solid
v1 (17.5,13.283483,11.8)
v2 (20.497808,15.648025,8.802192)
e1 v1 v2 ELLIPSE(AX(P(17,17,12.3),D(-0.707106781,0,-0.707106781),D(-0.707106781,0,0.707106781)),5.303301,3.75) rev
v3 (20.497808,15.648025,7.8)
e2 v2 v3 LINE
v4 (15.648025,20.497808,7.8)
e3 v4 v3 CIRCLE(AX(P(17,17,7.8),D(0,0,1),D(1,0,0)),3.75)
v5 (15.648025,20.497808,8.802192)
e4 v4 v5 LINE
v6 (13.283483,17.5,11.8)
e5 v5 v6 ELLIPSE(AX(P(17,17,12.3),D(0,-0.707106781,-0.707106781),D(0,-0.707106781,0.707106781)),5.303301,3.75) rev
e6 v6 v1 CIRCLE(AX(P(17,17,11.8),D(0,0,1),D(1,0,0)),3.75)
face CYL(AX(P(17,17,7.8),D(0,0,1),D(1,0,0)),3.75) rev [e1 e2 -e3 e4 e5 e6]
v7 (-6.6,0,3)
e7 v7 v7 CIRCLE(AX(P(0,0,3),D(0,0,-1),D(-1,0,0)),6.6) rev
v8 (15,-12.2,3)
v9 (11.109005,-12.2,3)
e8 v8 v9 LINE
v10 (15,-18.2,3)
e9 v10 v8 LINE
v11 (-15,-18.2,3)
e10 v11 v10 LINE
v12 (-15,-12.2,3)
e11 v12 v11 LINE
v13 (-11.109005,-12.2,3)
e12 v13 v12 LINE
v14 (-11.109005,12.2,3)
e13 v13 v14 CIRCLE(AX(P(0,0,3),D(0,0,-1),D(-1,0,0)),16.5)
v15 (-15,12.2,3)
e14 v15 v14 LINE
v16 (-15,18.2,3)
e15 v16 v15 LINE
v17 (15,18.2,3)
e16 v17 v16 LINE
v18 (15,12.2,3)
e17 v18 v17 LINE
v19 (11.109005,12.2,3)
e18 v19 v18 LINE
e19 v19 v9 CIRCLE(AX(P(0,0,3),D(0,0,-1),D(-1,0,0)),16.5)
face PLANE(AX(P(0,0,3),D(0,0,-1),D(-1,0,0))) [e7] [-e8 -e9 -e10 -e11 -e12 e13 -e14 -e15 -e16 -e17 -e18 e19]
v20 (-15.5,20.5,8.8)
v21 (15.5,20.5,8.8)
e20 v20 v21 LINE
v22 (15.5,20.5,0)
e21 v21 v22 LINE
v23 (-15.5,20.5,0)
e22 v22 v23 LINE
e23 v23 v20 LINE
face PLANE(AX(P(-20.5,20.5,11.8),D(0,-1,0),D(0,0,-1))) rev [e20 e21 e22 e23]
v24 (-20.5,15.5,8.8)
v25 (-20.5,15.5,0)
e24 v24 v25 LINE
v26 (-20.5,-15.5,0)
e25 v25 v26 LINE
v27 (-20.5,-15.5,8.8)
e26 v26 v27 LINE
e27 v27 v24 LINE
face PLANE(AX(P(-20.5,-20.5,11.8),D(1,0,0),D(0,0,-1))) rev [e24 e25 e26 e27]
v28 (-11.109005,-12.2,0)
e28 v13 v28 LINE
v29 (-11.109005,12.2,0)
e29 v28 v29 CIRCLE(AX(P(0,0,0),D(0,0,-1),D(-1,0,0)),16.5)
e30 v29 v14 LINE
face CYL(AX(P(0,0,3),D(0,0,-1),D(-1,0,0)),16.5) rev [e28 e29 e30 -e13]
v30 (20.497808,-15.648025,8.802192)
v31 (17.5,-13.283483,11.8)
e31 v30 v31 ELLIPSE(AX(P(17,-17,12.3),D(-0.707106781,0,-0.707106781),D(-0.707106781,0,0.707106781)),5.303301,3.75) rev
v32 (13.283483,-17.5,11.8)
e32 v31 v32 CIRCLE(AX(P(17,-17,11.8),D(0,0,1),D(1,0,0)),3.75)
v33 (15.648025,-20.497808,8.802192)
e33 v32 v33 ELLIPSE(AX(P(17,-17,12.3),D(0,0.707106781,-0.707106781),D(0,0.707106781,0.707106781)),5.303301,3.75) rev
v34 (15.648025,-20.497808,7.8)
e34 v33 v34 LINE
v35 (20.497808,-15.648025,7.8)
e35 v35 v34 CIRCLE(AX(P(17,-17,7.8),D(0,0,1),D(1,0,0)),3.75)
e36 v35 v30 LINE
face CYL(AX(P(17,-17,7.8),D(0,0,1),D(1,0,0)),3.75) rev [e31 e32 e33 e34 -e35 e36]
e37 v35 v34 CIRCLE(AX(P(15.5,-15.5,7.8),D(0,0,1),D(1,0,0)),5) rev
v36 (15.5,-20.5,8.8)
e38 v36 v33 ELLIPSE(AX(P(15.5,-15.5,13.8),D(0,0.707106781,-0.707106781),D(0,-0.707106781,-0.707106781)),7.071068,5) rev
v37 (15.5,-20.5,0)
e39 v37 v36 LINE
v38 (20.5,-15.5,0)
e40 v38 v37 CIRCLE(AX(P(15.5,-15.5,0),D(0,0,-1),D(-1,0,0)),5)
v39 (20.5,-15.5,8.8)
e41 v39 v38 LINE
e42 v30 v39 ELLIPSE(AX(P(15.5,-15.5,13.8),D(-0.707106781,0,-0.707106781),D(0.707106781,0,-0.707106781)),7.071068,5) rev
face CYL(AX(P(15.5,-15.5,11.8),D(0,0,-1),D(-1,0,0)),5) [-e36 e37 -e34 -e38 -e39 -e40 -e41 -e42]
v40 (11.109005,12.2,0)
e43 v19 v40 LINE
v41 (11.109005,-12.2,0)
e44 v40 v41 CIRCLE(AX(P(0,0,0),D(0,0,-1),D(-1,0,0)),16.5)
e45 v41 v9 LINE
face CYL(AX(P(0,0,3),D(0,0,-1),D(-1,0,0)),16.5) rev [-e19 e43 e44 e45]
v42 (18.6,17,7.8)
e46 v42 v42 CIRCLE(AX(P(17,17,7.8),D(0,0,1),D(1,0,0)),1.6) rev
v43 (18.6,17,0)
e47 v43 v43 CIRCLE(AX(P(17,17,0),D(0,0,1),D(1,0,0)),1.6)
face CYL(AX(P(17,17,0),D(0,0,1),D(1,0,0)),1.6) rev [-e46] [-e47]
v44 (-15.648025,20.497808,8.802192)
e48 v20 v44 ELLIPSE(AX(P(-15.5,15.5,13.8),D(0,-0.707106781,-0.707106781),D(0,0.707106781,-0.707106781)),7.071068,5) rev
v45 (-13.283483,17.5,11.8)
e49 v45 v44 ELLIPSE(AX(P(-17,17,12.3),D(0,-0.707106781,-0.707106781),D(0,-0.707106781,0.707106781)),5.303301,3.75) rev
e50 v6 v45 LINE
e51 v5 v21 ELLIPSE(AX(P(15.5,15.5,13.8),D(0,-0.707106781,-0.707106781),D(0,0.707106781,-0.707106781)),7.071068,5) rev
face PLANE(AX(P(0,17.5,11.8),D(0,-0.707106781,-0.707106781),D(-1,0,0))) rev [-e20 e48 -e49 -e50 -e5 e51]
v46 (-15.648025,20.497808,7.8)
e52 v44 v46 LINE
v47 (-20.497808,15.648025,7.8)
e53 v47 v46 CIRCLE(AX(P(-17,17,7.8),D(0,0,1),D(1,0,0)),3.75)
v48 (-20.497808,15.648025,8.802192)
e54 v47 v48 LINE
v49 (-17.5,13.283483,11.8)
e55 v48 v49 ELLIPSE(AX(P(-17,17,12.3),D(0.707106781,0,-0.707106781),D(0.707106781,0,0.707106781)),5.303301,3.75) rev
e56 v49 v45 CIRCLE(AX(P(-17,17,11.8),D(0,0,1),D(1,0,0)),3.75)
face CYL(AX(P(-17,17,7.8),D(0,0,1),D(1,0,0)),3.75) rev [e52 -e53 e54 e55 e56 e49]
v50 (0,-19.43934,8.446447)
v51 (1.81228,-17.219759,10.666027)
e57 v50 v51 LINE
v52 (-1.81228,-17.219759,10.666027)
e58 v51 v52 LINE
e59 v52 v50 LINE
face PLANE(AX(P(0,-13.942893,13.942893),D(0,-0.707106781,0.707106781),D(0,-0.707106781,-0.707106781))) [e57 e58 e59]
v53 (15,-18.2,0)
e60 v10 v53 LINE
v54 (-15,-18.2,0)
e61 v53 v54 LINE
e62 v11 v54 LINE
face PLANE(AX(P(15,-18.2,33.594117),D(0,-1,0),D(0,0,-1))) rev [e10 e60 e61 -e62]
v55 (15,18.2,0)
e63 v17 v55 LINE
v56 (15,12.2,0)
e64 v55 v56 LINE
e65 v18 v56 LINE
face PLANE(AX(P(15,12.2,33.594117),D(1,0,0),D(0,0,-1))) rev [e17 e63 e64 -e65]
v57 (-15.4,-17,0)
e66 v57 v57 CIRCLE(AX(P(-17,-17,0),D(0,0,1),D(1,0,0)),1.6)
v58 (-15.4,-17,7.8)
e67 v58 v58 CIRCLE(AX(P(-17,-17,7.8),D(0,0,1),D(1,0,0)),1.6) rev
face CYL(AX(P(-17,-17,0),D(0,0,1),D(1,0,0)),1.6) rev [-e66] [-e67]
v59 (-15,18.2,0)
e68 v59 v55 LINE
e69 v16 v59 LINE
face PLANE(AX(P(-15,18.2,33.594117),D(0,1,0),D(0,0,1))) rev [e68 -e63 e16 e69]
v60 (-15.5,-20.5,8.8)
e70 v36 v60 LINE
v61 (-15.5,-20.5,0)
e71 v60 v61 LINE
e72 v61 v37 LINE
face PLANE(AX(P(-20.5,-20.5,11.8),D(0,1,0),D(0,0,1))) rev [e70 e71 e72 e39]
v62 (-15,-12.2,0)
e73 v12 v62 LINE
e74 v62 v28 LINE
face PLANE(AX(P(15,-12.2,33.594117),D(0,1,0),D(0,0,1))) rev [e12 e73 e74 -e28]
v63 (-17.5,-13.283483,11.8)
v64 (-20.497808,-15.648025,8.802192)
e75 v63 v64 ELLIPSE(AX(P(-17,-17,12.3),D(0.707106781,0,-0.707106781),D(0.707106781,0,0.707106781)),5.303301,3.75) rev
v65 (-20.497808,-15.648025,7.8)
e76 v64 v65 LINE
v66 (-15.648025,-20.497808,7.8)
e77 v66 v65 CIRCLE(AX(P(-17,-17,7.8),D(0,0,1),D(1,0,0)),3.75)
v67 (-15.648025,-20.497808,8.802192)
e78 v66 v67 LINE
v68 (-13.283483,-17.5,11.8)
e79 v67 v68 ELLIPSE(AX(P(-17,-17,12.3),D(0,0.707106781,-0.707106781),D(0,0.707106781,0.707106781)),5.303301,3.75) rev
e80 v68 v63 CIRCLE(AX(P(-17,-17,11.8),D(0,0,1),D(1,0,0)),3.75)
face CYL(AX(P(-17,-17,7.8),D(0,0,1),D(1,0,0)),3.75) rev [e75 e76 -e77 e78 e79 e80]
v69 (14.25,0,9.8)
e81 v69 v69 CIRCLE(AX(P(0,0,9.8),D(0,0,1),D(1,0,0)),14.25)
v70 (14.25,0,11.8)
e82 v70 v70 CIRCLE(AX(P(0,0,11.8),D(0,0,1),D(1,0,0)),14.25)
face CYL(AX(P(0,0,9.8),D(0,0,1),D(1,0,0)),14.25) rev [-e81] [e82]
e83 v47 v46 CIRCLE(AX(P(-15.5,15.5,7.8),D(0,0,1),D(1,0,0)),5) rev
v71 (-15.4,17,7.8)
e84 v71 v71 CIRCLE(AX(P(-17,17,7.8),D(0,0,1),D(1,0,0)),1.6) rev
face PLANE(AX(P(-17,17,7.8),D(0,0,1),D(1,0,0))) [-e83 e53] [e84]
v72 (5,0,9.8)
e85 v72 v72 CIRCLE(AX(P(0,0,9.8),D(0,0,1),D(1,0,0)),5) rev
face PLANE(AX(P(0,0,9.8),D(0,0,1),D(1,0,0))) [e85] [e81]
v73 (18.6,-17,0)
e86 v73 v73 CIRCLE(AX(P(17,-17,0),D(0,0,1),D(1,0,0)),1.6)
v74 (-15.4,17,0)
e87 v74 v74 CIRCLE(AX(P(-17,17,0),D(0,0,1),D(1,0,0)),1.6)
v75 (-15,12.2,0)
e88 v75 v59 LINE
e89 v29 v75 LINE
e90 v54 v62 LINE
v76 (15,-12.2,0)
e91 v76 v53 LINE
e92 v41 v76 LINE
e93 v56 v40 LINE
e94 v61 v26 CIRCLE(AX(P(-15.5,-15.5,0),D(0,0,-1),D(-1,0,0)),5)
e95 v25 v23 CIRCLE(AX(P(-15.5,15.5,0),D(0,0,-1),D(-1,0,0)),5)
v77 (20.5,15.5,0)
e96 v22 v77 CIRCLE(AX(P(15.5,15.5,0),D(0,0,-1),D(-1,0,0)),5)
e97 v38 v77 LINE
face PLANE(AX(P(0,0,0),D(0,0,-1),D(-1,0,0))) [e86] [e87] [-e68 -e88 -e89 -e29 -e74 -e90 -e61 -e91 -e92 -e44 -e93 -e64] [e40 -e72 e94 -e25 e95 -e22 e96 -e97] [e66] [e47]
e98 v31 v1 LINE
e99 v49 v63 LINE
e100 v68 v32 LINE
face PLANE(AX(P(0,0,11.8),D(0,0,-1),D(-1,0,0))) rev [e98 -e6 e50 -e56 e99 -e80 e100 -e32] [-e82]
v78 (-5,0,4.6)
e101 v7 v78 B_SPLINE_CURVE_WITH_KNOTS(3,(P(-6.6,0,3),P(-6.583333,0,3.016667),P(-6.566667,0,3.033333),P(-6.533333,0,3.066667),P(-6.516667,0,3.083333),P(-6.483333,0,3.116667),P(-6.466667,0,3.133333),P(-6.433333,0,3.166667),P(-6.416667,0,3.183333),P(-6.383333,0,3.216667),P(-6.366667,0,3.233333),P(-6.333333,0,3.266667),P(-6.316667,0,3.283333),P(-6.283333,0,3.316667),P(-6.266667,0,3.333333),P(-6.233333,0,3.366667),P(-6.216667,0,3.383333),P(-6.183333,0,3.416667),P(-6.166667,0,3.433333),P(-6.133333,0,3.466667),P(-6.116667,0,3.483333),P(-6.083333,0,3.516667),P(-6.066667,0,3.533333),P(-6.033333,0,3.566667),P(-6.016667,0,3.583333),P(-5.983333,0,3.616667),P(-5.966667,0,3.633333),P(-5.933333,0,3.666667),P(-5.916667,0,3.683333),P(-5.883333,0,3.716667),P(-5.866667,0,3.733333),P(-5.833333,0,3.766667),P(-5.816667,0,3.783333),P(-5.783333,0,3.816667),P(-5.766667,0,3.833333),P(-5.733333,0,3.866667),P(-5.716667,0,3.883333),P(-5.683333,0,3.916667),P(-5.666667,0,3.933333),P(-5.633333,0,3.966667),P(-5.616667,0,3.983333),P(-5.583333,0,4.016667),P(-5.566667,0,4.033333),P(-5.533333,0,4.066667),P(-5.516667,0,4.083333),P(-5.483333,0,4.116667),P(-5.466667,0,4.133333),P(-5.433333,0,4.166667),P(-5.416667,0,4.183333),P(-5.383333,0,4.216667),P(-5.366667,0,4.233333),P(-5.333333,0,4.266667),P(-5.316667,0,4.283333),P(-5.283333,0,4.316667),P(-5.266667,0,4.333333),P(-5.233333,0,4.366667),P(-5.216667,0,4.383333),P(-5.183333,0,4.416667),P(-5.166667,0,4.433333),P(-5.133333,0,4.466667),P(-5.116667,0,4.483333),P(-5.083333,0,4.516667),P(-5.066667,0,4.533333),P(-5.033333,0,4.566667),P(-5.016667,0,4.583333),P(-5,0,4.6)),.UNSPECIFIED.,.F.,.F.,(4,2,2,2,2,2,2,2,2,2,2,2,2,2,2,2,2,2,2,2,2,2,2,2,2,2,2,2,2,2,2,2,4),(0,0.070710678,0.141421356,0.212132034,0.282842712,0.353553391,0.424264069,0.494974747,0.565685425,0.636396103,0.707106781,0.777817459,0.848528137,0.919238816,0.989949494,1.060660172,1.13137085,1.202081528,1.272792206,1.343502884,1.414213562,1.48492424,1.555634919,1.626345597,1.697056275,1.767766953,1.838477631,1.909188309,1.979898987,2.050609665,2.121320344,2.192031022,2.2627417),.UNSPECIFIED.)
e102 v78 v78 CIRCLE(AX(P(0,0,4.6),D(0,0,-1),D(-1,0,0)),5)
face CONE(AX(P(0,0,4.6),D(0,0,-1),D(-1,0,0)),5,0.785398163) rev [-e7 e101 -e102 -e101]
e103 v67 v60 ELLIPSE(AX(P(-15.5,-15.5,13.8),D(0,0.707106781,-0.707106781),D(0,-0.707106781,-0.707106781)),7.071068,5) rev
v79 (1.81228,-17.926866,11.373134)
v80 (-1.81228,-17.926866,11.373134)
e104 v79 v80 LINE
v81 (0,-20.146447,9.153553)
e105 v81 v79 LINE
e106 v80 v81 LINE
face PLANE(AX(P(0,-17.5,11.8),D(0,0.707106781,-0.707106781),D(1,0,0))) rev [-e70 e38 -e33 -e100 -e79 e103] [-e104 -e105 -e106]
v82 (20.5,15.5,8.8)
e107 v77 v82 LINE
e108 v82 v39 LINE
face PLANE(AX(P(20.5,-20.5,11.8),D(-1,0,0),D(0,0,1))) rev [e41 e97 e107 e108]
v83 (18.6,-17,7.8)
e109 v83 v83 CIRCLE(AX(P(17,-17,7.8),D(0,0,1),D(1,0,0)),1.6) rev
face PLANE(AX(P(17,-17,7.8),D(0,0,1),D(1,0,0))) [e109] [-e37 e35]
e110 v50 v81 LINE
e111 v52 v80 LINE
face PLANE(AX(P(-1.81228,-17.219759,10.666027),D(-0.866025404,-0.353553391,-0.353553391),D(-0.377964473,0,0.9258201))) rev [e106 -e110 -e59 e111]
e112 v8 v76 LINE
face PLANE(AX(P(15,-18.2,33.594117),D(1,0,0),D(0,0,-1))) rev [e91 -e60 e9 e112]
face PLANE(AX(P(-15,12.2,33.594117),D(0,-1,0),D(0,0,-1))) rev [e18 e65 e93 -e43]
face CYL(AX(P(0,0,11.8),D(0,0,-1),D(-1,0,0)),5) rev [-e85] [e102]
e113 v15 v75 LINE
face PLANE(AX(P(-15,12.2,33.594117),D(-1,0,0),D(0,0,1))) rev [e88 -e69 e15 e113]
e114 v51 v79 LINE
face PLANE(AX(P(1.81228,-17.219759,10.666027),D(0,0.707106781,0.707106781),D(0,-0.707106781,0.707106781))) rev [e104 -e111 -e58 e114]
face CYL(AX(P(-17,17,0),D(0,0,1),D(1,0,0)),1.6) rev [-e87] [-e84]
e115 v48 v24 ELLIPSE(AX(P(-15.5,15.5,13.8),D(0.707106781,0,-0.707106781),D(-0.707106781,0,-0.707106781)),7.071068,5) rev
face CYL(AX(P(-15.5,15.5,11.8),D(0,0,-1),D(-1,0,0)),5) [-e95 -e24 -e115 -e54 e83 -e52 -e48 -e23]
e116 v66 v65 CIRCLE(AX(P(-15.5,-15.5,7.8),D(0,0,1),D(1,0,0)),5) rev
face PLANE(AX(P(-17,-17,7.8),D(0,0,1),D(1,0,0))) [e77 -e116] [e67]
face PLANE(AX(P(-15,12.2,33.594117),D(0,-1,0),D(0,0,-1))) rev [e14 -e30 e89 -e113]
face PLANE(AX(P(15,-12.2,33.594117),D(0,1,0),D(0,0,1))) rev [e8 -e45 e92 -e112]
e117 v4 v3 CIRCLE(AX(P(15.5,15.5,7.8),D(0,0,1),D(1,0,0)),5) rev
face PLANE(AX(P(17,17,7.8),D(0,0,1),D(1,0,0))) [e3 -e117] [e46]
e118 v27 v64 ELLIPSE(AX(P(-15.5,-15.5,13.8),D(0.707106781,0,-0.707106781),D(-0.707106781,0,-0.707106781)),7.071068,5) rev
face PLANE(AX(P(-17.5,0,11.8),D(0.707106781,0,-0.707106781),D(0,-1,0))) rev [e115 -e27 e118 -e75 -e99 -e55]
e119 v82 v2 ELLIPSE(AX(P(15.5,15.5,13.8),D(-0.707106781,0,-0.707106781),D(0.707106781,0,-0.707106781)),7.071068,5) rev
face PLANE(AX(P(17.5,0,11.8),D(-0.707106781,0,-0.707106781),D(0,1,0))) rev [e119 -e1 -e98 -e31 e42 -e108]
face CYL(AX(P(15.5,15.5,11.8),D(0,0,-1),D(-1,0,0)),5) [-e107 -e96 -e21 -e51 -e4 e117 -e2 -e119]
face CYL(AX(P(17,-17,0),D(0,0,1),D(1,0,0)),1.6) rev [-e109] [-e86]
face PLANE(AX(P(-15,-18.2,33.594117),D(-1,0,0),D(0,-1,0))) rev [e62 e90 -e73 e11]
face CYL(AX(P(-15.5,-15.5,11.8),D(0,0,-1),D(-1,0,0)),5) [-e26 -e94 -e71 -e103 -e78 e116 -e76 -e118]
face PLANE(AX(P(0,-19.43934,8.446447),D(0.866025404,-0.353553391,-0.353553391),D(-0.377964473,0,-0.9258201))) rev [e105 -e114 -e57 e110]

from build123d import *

# Parameters (mm, degrees)
SKETCH_1_W          = 41
SKETCH_1_H          = 41
EXTRUDE_1_DEPTH     = 11.8
CHAMFER_1_SIZE      = 3
FILLET_1_R          = 5
SKETCH_3_R          = 16.5
CUT_EXTRUDE_2_DEPTH = 3
SKETCH_4_R          = 5
CUT_EXTRUDE_3_DEPTH = 31.297524651
SKETCH_5_W          = 30
SKETCH_5_H          = 6
CUT_EXTRUDE_4_DEPTH = 3
CHAMFER_2_SIZE      = 1.6
SKETCH_6_R          = 14.25
CUT_EXTRUDE_5_DEPTH = 2
CUT_EXTRUDE_6_DEPTH = 1
SKETCH_8_R          = 1.6
CUT_EXTRUDE_7_DEPTH = 32.300798712
SKETCH_9_R          = 3.75
CUT_EXTRUDE_8_DEPTH = 4


with BuildPart() as part:
    # ｽｹｯﾁ1 → ﾎﾞｽ - 押し出し1 (new body)
    with BuildSketch(Plane.XY):
        Rectangle(SKETCH_1_W, SKETCH_1_H)
    extrude(amount=EXTRUDE_1_DEPTH)

    # 面取り1
    chamfer_1_edges = [part.edges().sort_by_distance(p)[0] for p in [
        (-20.5, 0, 11.8),
        (0, -20.5, 11.8),
        (20.5, 0, 11.8),
        (0, 20.5, 11.8),
    ]]
    chamfer(chamfer_1_edges, length=CHAMFER_1_SIZE)

    # ﾌｨﾚｯﾄ1
    # the kernel refuses this fillet: 5 mm, written as the material it takes off along each edge
    with BuildSketch(Plane(origin=(20.5, -20.5, -12.5), x_dir=(-1, 0, 0), z_dir=(0, 0, 1)), Plane(origin=(20.5, 20.5, -12.5), x_dir=(0, -1, 0), z_dir=(0, 0, 1))) as fillet_1_piece_1:
        with BuildLine():
            CenterArc((FILLET_1_R, -FILLET_1_R), FILLET_1_R, 90, 90)
            Line((0, -FILLET_1_R), (0, 0))
            Line((0, 0), (FILLET_1_R, 0))
        make_face()
    extrude(amount=33.8, mode=Mode.SUBTRACT)
    with BuildSketch(Plane(origin=(-20.5, -20.5, -12.5), x_dir=(1, 0, 0), z_dir=(0, 0, 1)), Plane(origin=(-20.5, 20.5, -12.5), x_dir=(0, -1, 0), z_dir=(0, 0, 1))) as fillet_1_piece_2:
        with BuildLine():
            CenterArc((FILLET_1_R, FILLET_1_R), FILLET_1_R, 180, 90)
            Line((0, FILLET_1_R), (0, 0))
            Line((0, 0), (FILLET_1_R, 0))
        make_face()
    extrude(amount=33.8, mode=Mode.SUBTRACT)
    with BuildSketch(Plane(origin=(-24.666666667, 24.666666667, 4.633333333), x_dir=(-0.408248290463863, -0.816496580927726, -0.408248290463863), z_dir=(0.5773502691896258, -0.5773502691896258, 0.5773502691896258)), Plane(origin=(-24.666666667, -24.666666667, 4.633333333), x_dir=(0.816496580927726, -0.408248290463863, -0.408248290463863), z_dir=(0.5773502691896258, 0.5773502691896258, 0.5773502691896258))) as fillet_1_piece_3:
        with BuildLine():
            CenterArc((FILLET_1_R * 0.57735026919, FILLET_1_R), FILLET_1_R, 210, 60)
            Line((-FILLET_1_R * 0.288675134595, FILLET_1_R * 0.5), (0, 0))
            Line((0, 0), (FILLET_1_R * 0.57735026919, 0))
        make_face()
    extrude(amount=19.629909152, mode=Mode.SUBTRACT)
    with BuildSketch(Plane(origin=(24.666666667, 24.666666667, 4.633333333), x_dir=(0.40824829046386313, -0.816496580927726, -0.40824829046386285), z_dir=(-0.5773502691896258, -0.5773502691896258, 0.5773502691896258)), Plane(origin=(24.666666667, -24.666666667, 4.633333333), x_dir=(-0.816496580927726, -0.40824829046386285, -0.4082482904638632), z_dir=(-0.5773502691896258, 0.5773502691896258, 0.5773502691896258))) as fillet_1_piece_4:
        with BuildLine():
            CenterArc((FILLET_1_R * 0.57735026919, -FILLET_1_R), FILLET_1_R, 90, 60)
            Line((-FILLET_1_R * 0.288675134595, -FILLET_1_R * 0.5), (0, 0))
            Line((0, 0), (FILLET_1_R * 0.57735026919, 0))
        make_face()
    extrude(amount=19.629909152, mode=Mode.SUBTRACT)

    # ｽｹｯﾁ3 → ｶｯﾄ - 押し出し2 (cut)
    with BuildSketch(Plane(origin=(0, 0, 0), x_dir=(-1, 0, 0), z_dir=(0, 0, -1))):
        Circle(SKETCH_3_R)
    extrude(amount=-CUT_EXTRUDE_2_DEPTH, mode=Mode.SUBTRACT)

    # ｽｹｯﾁ4 → ｶｯﾄ - 押し出し3 (cut, through all)
    with BuildSketch(Plane(origin=(0, 0, 3), x_dir=(-1, 0, 0), z_dir=(0, 0, -1))):
        Circle(SKETCH_4_R)
    extrude(amount=-CUT_EXTRUDE_3_DEPTH, mode=Mode.SUBTRACT)

    # ｽｹｯﾁ5 → ｶｯﾄ - 押し出し4 (cut)
    with BuildSketch(Plane(origin=(0, 0, 0), x_dir=(-1, 0, 0), z_dir=(0, 0, -1))):
        with Locations((0, 15.2)):
            Rectangle(SKETCH_5_W, SKETCH_5_H)
        with Locations((0, -15.2)):
            Rectangle(SKETCH_5_W, SKETCH_5_H)
    extrude(amount=-CUT_EXTRUDE_4_DEPTH, mode=Mode.SUBTRACT)

    # 面取り2
    chamfer_2_edges = [part.edges().sort_by_distance(p)[0] for p in [
        (5, 0, 3),
    ]]
    chamfer(chamfer_2_edges, length=CHAMFER_2_SIZE)

    # ｽｹｯﾁ6 → ｶｯﾄ - 押し出し5 (cut)
    with BuildSketch(Plane.XY.offset(11.8)):
        Circle(SKETCH_6_R)
    extrude(amount=-CUT_EXTRUDE_5_DEPTH, mode=Mode.SUBTRACT)

    # ｽｹｯﾁ7 → ｶｯﾄ - 押し出し6 (cut)
    with BuildSketch(Plane(origin=(0, -14.65, 14.65), x_dir=(1, 0, 0), z_dir=(0, -0.7071067811865491, 0.707106781186546))):
        Polygon((0, -7.77314934), (1.812279996, -4.634188309), (-1.812279996, -4.634188309), align=None)
    extrude(amount=-CUT_EXTRUDE_6_DEPTH, mode=Mode.SUBTRACT)

    # ｽｹｯﾁ8 → ｶｯﾄ - 押し出し7 (cut, through all)
    with BuildSketch(Plane.XY.offset(11.8)):
        with Locations((-17, 17)):
            Circle(SKETCH_8_R)
        with Locations((-17, -17)):
            Circle(SKETCH_8_R)
        with Locations((17, -17)):
            Circle(SKETCH_8_R)
        with Locations((17, 17)):
            Circle(SKETCH_8_R)
    extrude(amount=-CUT_EXTRUDE_7_DEPTH, mode=Mode.SUBTRACT)

    # ｽｹｯﾁ9 → ｶｯﾄ - 押し出し8 (cut)
    with BuildSketch(Plane.XY.offset(11.8)):
        with Locations((17, 17)):
            Circle(SKETCH_9_R)
        with Locations((-17, 17)):
            Circle(SKETCH_9_R)
        with Locations((-17, -17)):
            Circle(SKETCH_9_R)
        with Locations((17, -17)):
            Circle(SKETCH_9_R)
    extrude(amount=-CUT_EXTRUDE_8_DEPTH, mode=Mode.SUBTRACT)


solid = part.part
